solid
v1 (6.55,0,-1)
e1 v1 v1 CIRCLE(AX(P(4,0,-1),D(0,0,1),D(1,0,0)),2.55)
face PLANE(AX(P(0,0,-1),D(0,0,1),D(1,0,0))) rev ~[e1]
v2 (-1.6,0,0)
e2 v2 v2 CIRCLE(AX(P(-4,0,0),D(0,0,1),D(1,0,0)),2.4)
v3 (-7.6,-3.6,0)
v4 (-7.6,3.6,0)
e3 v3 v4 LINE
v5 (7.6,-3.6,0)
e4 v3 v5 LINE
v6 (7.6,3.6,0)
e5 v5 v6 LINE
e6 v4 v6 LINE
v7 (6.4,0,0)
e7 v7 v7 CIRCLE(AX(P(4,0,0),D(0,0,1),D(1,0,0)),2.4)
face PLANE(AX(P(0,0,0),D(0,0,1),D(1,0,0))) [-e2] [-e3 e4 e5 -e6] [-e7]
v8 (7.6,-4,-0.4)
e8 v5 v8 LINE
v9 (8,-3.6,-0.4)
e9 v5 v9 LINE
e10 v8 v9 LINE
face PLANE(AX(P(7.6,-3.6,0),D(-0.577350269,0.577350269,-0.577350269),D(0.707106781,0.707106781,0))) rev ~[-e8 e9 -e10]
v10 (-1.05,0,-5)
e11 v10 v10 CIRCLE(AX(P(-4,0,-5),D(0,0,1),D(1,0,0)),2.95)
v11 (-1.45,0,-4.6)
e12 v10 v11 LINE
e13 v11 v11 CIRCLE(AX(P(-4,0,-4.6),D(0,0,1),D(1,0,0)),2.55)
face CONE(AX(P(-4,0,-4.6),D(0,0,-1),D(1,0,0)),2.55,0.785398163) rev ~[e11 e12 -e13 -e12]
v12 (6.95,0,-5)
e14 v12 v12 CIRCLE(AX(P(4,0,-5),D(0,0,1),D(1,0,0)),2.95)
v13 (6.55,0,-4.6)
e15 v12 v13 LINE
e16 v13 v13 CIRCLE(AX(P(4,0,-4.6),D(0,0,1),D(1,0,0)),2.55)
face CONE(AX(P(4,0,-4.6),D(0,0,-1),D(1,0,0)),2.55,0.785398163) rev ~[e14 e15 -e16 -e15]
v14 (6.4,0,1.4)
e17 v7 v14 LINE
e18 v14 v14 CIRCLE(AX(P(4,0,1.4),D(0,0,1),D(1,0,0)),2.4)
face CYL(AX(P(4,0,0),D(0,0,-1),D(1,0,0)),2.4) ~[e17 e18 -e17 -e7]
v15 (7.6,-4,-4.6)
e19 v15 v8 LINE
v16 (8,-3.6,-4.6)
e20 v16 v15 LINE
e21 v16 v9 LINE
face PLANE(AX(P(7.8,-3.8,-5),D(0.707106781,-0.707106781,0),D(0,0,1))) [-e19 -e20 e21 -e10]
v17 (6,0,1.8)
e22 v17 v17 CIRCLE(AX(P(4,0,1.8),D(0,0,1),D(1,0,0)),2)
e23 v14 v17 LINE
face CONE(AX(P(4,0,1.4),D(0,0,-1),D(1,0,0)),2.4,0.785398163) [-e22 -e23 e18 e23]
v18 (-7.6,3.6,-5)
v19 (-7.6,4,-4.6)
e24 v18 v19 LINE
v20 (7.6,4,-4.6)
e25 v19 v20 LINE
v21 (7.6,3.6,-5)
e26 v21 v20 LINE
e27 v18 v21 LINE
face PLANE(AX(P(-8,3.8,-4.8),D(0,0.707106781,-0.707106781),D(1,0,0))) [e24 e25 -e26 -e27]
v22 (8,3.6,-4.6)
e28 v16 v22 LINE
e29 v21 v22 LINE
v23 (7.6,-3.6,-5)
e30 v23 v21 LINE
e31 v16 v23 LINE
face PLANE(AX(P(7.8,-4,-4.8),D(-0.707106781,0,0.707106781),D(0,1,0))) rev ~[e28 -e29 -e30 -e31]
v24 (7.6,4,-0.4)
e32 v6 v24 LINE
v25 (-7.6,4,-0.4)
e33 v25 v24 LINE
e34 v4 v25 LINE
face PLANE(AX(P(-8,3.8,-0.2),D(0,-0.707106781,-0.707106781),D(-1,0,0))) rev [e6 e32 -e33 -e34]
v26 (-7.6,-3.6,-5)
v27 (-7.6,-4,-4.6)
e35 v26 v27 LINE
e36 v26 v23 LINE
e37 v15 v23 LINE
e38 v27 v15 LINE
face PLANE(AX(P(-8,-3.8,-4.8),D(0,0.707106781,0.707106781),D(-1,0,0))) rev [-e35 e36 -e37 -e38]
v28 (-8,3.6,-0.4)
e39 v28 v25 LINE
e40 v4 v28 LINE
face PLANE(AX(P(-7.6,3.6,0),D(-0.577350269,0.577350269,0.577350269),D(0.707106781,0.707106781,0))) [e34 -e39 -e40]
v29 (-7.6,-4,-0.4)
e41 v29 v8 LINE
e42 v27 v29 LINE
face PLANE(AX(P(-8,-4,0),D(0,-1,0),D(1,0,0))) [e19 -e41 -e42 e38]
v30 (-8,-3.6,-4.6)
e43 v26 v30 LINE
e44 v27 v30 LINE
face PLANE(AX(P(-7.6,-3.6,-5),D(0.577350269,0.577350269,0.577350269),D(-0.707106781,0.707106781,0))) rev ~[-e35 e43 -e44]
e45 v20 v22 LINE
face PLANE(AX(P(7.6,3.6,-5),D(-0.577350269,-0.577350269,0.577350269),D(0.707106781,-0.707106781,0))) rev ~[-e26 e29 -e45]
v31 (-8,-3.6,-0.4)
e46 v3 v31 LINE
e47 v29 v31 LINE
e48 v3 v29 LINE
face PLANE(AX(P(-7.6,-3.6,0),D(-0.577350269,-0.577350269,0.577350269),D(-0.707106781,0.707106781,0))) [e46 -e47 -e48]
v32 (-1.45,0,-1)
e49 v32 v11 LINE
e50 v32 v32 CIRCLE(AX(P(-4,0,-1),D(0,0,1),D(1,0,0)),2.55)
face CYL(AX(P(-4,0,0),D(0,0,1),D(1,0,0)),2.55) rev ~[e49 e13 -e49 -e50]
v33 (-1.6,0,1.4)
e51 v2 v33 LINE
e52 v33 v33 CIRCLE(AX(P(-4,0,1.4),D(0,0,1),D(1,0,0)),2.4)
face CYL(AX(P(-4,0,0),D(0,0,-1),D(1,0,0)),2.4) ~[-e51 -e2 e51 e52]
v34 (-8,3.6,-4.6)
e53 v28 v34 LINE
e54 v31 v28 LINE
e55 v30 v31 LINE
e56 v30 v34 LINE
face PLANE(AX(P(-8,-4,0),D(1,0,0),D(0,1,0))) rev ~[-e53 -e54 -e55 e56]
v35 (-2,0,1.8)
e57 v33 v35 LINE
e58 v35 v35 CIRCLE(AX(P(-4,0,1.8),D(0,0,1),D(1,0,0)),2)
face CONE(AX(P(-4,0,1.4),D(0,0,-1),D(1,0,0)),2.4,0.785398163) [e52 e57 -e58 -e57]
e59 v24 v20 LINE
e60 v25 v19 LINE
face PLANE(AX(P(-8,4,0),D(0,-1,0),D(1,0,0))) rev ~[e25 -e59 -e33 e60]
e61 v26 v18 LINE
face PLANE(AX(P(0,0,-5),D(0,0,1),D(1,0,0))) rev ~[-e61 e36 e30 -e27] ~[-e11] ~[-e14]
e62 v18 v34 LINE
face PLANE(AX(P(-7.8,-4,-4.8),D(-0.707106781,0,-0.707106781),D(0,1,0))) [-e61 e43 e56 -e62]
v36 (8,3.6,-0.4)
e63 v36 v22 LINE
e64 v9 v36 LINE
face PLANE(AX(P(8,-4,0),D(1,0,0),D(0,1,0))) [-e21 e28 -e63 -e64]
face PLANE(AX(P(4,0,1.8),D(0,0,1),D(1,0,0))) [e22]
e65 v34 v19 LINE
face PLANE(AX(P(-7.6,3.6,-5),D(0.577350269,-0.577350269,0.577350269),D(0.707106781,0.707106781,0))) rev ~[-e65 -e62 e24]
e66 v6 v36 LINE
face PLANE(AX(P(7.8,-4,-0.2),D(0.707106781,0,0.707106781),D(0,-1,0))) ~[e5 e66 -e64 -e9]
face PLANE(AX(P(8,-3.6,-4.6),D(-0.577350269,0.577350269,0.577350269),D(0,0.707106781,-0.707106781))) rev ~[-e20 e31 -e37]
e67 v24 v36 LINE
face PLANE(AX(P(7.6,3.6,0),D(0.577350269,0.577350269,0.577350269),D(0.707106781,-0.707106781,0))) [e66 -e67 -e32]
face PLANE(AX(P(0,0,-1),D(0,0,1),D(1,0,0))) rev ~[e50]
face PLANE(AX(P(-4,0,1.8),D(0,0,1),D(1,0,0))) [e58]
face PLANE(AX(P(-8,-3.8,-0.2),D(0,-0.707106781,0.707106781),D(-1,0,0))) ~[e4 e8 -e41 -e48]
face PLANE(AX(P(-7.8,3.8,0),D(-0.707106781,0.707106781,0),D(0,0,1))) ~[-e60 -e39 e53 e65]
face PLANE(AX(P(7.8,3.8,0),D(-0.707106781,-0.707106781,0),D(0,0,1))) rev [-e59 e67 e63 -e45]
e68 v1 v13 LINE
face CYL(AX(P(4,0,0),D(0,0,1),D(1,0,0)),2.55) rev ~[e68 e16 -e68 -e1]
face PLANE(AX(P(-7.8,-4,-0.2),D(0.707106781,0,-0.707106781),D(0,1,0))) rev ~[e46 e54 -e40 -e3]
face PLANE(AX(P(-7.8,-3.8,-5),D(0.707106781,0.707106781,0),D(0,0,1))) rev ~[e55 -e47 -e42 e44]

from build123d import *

# Parameters (mm, degrees)
F0_W     = 16
F0_H     = 8
F0_W_2   = 14
F0_H_2   = 6
F0_R     = 2.995
F0_R_2   = 2.55
F0_R_3   = 2.4
F1_DEPTH = 1
F2_DEPTH = 1.8
F3_DEPTH = 5
F4_SIZE  = 0.4


# Not quite as in the source:
# - a feature names something its author has since deleted; it is built from what else it names


with BuildPart() as f1:
    # F0 (on Top) → F1 (new body)
    with BuildSketch(Plane.XY):
        Rectangle(F0_W, F0_H)
        Rectangle(F0_W_2, F0_H_2, mode=Mode.SUBTRACT)
        Rectangle(F0_W_2, F0_H_2)
        with Locations((-4, 0)):
            Circle(F0_R, mode=Mode.SUBTRACT)
        with Locations((4, 0)):
            Circle(F0_R, mode=Mode.SUBTRACT)
        with Locations((-4, 0)):
            Circle(F0_R)
        with Locations((-4, 0)):
            Circle(F0_R_2, mode=Mode.SUBTRACT)
        with Locations((4, 0)):
            Circle(F0_R)
        with Locations((4, 0)):
            Circle(F0_R_2, mode=Mode.SUBTRACT)
        with Locations((-4, 0)):
            Circle(F0_R_2)
        with Locations((-4, 0)):
            Circle(F0_R_3, mode=Mode.SUBTRACT)
        with Locations((4, 0)):
            Circle(F0_R_2)
        with Locations((4, 0)):
            Circle(F0_R_3, mode=Mode.SUBTRACT)
        with Locations((4, 0)):
            Circle(F0_R_3)
        with Locations((-4, 0)):
            Circle(F0_R_3)
    extrude(amount=-F1_DEPTH)

    # F0 (on Top) → F2 (join)
    with BuildSketch(Plane.XY):
        with Locations((-4, 0)):
            Circle(F0_R_3)
        with Locations((4, 0)):
            Circle(F0_R_3)
    extrude(amount=F2_DEPTH)

    # F0 (on Top) → F3 (join)
    with BuildSketch(Plane.XY):
        Rectangle(F0_W, F0_H)
        Rectangle(F0_W_2, F0_H_2, mode=Mode.SUBTRACT)
        Rectangle(F0_W_2, F0_H_2)
        with Locations((-4, 0)):
            Circle(F0_R, mode=Mode.SUBTRACT)
        with Locations((4, 0)):
            Circle(F0_R, mode=Mode.SUBTRACT)
        with Locations((4, 0)):
            Circle(F0_R)
        with Locations((4, 0)):
            Circle(F0_R_2, mode=Mode.SUBTRACT)
        with Locations((-4, 0)):
            Circle(F0_R)
        with Locations((-4, 0)):
            Circle(F0_R_2, mode=Mode.SUBTRACT)
    extrude(amount=-F3_DEPTH)

    # F4
    f4_edges = [f1.edges().sort_by_distance(p)[0] for p in [
        (-6.4, 0, 1.8),
        (1.6, 0, 1.8),
        (-8, -4, -2.5),
        (0, -4, -5),
        (8, -4, -2.5),
        (0, -4, 0),
        (-8, 4, -2.5),
        (-8, 0, -5),
        (-8, 0, 0),
        (8, 4, -2.5),
        (0, 4, -5),
        (0, 4, 0),
        (8, 0, -5),
        (8, 0, 0),
        (1.45, 0, -5),
        (-6.55, 0, -5),
    ]]
    chamfer(f4_edges, length=F4_SIZE)


solid = f1.part
